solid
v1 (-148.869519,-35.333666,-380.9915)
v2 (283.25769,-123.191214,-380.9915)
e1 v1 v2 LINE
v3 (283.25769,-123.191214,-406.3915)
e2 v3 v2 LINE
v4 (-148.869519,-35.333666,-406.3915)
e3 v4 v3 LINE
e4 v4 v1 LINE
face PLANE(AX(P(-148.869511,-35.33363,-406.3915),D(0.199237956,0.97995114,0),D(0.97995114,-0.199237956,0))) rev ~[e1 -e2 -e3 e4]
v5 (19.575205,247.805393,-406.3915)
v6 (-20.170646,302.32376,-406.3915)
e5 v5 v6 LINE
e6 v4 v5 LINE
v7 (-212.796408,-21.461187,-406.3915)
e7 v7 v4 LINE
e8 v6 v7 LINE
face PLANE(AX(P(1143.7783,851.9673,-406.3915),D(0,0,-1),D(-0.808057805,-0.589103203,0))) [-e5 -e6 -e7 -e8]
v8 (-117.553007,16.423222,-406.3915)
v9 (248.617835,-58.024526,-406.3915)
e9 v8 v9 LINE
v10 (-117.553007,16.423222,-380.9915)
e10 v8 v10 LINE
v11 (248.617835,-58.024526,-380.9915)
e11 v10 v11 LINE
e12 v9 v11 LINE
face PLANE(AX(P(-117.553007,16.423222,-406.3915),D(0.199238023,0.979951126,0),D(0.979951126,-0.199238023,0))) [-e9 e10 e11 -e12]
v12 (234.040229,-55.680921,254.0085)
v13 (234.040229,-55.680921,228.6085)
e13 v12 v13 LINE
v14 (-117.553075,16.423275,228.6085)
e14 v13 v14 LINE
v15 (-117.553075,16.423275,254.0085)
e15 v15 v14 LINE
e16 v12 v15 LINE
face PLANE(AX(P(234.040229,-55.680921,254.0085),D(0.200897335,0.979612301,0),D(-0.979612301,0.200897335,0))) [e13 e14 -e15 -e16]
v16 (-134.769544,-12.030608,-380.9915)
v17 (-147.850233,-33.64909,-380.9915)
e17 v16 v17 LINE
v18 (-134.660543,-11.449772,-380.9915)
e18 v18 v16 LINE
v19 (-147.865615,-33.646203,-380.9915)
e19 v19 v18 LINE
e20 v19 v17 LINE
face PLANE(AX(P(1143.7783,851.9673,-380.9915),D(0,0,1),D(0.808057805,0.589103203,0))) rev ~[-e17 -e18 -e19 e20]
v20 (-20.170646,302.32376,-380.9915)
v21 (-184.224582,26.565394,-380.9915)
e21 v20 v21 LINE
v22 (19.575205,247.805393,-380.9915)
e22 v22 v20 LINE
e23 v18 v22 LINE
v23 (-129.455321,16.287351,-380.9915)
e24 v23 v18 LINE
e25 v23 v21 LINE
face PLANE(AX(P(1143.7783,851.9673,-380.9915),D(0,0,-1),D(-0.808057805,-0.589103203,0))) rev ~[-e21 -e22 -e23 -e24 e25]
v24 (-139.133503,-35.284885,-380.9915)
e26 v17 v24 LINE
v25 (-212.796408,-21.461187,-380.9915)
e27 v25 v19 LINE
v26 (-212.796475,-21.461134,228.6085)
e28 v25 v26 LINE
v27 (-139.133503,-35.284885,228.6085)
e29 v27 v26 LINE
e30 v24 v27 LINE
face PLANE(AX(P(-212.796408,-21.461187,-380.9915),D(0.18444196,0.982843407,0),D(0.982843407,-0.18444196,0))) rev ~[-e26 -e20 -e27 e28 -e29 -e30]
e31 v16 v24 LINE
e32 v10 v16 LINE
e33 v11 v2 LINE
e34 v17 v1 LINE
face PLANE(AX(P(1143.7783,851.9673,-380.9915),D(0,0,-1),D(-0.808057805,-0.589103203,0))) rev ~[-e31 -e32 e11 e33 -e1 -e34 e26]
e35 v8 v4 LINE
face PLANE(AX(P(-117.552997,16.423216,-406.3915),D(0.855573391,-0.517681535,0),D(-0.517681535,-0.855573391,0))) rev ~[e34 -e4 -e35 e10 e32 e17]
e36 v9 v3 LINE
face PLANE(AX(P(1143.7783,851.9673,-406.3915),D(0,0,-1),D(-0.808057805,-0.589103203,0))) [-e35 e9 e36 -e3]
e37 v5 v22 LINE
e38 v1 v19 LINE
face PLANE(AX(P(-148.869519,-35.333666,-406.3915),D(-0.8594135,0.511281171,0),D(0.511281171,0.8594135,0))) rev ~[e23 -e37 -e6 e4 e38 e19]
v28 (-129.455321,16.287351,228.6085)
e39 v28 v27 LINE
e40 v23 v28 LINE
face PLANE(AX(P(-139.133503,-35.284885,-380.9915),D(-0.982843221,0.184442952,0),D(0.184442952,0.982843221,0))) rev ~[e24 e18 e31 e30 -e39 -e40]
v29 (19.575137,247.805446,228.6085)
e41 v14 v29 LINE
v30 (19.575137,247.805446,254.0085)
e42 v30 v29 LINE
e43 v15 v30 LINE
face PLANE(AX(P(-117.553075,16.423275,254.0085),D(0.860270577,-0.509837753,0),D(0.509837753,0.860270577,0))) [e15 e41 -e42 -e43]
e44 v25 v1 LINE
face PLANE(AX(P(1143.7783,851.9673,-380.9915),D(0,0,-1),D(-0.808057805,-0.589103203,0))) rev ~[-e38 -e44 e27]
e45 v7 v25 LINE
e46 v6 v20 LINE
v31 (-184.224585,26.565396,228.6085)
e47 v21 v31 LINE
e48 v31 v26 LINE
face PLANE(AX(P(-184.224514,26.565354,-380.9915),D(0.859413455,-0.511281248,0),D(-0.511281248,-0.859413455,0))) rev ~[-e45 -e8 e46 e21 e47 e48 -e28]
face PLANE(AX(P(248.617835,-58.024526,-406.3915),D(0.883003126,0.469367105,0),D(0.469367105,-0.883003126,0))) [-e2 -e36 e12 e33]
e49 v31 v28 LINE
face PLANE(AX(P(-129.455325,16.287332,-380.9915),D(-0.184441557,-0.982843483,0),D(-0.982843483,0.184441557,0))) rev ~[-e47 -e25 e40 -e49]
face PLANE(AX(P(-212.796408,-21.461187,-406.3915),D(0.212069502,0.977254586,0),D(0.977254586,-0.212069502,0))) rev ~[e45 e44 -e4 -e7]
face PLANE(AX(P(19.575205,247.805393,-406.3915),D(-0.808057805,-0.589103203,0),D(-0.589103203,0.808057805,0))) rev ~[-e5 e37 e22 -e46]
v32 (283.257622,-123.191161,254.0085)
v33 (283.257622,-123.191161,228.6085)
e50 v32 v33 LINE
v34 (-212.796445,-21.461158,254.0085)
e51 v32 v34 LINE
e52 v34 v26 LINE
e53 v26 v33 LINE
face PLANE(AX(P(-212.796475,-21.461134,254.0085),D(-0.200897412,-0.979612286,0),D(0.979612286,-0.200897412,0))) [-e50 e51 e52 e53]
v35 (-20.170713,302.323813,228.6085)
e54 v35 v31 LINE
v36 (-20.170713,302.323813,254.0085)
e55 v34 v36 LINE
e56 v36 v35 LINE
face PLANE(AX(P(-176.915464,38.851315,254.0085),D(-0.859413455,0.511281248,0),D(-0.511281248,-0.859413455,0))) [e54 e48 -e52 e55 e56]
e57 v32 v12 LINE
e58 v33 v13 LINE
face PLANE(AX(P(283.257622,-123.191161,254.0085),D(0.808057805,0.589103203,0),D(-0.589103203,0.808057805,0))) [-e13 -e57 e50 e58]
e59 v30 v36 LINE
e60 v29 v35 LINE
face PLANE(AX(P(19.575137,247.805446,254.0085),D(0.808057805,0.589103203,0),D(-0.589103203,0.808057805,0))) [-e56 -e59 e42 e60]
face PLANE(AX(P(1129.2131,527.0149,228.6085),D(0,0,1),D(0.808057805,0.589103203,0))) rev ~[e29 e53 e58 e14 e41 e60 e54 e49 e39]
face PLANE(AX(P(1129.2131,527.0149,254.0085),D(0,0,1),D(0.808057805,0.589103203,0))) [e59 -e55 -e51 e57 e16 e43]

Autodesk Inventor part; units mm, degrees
ref_plane "YZ Plane" through (0, 0, 0) normal (1, 0, 0) x (0, 1, 0)
ref_plane "XZ Plane" through (0, 0, 0) normal (0, 1, 0) x (-1, 0, 0)
ref_plane "XY Plane" through (0, 0, 0) normal (0, 0, 1) x (1, 0, 0)
ref_plane "Work Plane1" through (1143.7783, 851.9673, -406.3915) normal (0, 0, -1) x (-0.8080578, -0.5891032, 0)
sketch "Sketch1" plane through (1143.7783, 851.9673, -406.3915) normal (0, 0, -1) x (-0.8080578, -0.5891032, 0)
  line L0 (1269.8194, 209.303) -> (1593.8019, 73.5805)
  line L1 (1593.8019, 73.5805) -> (1269.8194, -281.049)
  line L2 (1259.4205, 173.4665) -> (1567.246, 44.5125)
  line L3 (1511.4503, 67.8864) -> (1259.4205, -207.9841)
  line L4 (1259.4205, 213.6593) -> (1259.4205, 173.4665)
  line L5 (1259.4205, -207.9841) -> (1269.8194, -281.049)
  point P0 (1426.1356, -14.6355)
extrude "Extrusion1" add sketch "Sketch1" against normal blind 25.4
ref_plane "Work Plane3" through (1143.7783, 851.9673, -406.3915) normal (0, 0, -1) x (-0.8080578, -0.5891032, 0)
sketch "Sketch3" plane through (1143.7783, 851.9673, -406.3915) normal (0, 0, -1) x (-0.8080578, -0.5891032, 0)
  line L0 (1264.3348, 241.5423) -> (1610.7303, 93.3818)
  line L1 (1511.4503, 67.8864) -> (1567.246, 44.5125) projected
  line L2 (1610.7303, 93.3818) -> (1567.246, 44.5125)
  line L3 (1567.246, 44.5125) -> (1264.3348, 174.0739)
  line L4 (1264.3348, 174.0739) -> (1264.3348, 241.5423)
  point P0 (1426.1356, -14.6355)
extrude "Extrusion3" add sketch "Sketch3" against normal blind 25.4
ref_plane "Work Plane4" through (1129.2131, 527.0149, 254.0085) normal (0, 0, 1) x (0.8080578, 0.5891032, 0)
sketch "Sketch4" plane through (1129.2131, 527.0149, 254.0085) normal (0, 0, 1) x (0.8080578, 0.5891032, 0)
  line L0 (-1061.1348, 428.0739) -> (-1061.1348, 495.5423) projected
  line L1 (-1061.1348, 495.5423) -> (-1407.5303, 347.3818) projected
  line L2 (-1061.1348, 495.5423) -> (-1407.5303, 347.3818)
  line L3 (-1364.046, 298.5125) -> (-1066.6194, -27.049) projected
  line L4 (-1407.5303, 347.3818) -> (-1066.6194, -27.049)
  line L5 (-1066.6194, -27.049) -> (-1066.6194, 56.4973)
  line L6 (-1308.2503, 321.8864) -> (-1364.046, 298.5125) projected
  line L7 (-1066.6194, 56.4973) -> (-1308.2503, 321.8864)
  line L8 (-1364.046, 298.5125) -> (-1061.1348, 428.0739) projected
  line L9 (-1308.2503, 321.8864) -> (-1061.1348, 428.0739)
  line L10 (-1061.1348, 428.0739) -> (-1061.1348, 495.5423)
  line L11 (-1407.5303, 347.3818) -> (-1364.046, 298.5125) projected
  line L12 (-1407.5303, 347.3818) -> (-1343.0061, 374.9801)
  line L13 (-1308.2503, 321.8864) -> (-1364.046, 298.5125)
  point P0 (-1222.9356, 239.3645)
  point P1 (-1364.046, 298.5125)
  point P2 (-1293.9365, 306.2186)
extrude "Extrusion4" add sketch "Sketch4" against normal blind 25.4 contours L8 L4 L1 L0 | L9 L6 L4 L8 | L7 L5 L4 L6
sketch "Sketch5" plane through (1143.7783, 851.9673, -380.9915) normal (0, 0, 1) x (0.8080578, 0.5891032, 0)
  line L0 (-1567.246, 44.5125) -> (-1264.3348, 174.0739) projected
  line L1 (-1514.0603, 67.2611) -> (-1559.35, 115.3583)
  line L2 (-1264.3348, 241.5423) -> (-1610.7303, 93.3818) projected
  line L3 (-1610.7303, 93.3818) -> (-1559.35, 38.8164)
  line L4 (-1559.35, 38.8164) -> (-1521.1481, 74.7883)
  point P0 (-1426.1356, -14.6355)
  point P1 (-1264.3348, 174.0739)
  point P2 (-1584.1346, -28.1729)
extrude "Extrusion5" add sketch "Sketch5" along normal blind 635 contours L3 L2 L1 L4 L0 | L0 L4 L3
properties part number "RearCrumple"
